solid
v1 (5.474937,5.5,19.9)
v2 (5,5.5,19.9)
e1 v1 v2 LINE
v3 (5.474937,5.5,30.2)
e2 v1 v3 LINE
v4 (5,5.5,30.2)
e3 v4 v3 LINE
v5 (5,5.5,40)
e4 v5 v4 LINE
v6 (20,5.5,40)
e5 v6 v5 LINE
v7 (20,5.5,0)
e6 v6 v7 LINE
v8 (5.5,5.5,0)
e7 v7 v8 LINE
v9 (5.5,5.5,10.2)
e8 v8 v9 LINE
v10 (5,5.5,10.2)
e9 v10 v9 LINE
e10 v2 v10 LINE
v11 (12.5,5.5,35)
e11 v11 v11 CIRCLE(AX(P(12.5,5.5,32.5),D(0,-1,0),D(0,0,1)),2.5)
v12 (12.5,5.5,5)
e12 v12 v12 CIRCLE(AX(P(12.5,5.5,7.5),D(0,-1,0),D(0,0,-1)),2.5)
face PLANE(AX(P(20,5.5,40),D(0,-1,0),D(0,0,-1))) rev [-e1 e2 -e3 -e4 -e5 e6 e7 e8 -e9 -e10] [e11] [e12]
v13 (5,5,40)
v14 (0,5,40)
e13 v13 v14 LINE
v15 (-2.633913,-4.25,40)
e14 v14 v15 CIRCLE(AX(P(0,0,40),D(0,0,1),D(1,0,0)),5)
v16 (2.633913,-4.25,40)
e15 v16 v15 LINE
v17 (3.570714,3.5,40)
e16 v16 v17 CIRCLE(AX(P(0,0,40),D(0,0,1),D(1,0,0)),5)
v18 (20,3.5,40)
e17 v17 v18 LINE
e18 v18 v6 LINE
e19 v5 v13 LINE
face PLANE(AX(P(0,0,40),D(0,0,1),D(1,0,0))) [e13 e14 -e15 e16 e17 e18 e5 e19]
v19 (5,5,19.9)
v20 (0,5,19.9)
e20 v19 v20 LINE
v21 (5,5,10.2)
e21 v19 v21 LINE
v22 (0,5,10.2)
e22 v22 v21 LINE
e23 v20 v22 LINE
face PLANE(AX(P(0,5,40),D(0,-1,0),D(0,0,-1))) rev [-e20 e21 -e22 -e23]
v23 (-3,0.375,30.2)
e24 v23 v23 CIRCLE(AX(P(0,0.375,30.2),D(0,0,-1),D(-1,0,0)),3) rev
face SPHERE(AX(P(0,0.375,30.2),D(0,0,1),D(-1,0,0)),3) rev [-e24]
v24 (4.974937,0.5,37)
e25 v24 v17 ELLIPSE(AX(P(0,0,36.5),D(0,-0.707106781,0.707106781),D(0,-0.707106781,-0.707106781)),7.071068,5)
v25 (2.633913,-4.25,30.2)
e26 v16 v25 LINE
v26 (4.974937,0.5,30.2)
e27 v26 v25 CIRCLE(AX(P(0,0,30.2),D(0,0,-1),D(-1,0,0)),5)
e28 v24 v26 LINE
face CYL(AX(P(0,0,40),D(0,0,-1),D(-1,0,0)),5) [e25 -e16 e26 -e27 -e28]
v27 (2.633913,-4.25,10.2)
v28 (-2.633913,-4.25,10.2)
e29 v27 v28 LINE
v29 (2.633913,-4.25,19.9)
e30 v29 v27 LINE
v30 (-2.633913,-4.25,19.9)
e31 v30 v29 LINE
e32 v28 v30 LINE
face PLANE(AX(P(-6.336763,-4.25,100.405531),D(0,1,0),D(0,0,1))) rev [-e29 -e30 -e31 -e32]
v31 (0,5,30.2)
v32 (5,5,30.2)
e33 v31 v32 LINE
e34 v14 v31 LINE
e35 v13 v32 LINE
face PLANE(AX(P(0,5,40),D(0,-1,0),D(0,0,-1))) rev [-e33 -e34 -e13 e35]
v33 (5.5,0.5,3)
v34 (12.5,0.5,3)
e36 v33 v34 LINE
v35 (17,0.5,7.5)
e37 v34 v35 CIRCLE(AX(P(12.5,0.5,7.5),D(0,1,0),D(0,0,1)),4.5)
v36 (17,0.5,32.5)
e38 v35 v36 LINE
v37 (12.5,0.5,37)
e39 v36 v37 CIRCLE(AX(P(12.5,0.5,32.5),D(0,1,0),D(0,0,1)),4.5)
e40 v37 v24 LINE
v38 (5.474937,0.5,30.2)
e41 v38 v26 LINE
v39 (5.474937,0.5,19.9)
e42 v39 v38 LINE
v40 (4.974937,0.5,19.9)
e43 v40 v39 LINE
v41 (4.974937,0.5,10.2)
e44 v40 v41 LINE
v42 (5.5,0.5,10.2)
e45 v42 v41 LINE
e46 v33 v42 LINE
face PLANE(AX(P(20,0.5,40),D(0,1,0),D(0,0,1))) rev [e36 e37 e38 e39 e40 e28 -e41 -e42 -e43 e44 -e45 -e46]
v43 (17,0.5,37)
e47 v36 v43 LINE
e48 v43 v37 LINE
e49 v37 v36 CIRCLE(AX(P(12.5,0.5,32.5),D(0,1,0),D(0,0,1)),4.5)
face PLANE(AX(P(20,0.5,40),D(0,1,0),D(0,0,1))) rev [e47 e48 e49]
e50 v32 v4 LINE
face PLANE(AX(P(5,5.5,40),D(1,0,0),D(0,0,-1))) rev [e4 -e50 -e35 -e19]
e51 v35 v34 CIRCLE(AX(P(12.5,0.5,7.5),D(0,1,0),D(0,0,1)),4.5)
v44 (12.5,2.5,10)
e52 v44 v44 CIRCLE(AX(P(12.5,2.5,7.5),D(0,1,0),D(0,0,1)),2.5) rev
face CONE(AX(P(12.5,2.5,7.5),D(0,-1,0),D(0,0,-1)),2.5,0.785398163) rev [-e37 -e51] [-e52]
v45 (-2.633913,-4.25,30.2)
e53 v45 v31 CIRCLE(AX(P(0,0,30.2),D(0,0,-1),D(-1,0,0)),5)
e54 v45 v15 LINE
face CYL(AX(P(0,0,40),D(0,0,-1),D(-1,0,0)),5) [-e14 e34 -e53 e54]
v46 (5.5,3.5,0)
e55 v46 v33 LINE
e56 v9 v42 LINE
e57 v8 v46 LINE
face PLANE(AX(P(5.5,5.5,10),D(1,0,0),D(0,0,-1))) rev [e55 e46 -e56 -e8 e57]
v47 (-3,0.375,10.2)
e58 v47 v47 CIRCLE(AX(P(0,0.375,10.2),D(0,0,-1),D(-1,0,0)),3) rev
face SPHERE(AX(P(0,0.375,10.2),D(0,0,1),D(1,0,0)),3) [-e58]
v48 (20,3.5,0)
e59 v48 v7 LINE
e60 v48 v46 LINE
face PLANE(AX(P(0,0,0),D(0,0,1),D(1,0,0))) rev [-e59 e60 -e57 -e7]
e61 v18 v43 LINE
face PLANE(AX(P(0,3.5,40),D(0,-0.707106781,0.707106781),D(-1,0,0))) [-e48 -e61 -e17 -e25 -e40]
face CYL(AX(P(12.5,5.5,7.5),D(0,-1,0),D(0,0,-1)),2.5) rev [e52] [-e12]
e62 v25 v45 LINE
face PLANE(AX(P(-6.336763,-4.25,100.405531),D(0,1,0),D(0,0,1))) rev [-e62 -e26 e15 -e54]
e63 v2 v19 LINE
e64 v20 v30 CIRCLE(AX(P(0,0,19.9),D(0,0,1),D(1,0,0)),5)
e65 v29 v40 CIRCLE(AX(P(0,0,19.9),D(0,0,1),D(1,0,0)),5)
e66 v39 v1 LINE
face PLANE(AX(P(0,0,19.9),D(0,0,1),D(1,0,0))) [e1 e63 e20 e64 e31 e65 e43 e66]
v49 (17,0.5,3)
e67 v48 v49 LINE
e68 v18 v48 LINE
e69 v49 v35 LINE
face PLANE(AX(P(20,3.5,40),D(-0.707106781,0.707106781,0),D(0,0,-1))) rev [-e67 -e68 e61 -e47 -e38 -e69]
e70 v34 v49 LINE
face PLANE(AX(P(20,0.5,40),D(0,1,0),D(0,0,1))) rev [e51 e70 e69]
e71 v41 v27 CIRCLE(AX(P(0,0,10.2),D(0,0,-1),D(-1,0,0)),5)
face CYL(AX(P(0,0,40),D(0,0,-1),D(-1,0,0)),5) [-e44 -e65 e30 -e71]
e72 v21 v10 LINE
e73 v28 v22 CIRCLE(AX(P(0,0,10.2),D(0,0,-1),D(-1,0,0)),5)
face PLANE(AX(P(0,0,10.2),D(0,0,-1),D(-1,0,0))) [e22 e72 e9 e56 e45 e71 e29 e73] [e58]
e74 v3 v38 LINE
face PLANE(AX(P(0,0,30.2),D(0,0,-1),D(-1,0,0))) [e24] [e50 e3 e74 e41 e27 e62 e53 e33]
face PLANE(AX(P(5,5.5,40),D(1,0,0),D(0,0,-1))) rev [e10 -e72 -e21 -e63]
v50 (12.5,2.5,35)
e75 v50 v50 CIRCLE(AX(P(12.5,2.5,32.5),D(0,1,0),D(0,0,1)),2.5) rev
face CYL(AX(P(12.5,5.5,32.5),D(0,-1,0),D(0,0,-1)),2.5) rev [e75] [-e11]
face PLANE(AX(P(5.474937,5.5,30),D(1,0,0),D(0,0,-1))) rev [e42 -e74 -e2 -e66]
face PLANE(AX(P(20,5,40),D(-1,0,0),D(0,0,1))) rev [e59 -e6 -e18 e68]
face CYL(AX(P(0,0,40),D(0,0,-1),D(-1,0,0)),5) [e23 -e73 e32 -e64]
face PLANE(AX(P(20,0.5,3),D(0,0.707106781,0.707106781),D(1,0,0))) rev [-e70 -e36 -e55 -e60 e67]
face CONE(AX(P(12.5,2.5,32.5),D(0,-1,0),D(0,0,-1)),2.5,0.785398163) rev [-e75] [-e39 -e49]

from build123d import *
from build123d.topology import SkipClean

# Parameters (mm, degrees)
IZIM1_R                     = 3.5
Y_KSEKLIK_EKSTR_ZYON1_DEPTH = 40
KES_EKSTR_ZYON1_DEPTH       = 46.058295574
KES_EKSTR_ZYON1_DEPTH_BACK  = 46.058295574
IZIM3_W                     = 10
IZIM3_H                     = 10
KES_EKSTR_ZYON2_DEPTH       = 46.771852704
IZIM5_R                     = 2.5
KES_EKSTR_ZYON4_DEPTH       = 46
PAH1_SIZE                   = 3
IZIM4_W                     = 0.5
IZIM4_H                     = 10
KES_EKSTR_ZYON5_DEPTH       = 46
PAH2_SIZE                   = 2
BOSS_EXTRUDE1_START         = -10
SKETCH1_R                   = 3.5
BOSS_EXTRUDE1_DEPTH         = 10
BOSS_EXTRUDE2_START         = -10
SKETCH2_R                   = 3.5
BOSS_EXTRUDE2_DEPTH         = 10
CUT_EXTRUDE1_DEPTH          = 0.2
CUT_EXTRUDE2_DEPTH          = 0.2
CUT_EXTRUDE3_START          = -0.1
CUT_EXTRUDE3_DEPTH          = 0.1


with BuildPart() as part:
    # Çizim1 → Yükseklik-Ekstrüzyon1 (new body)
    with BuildSketch(Plane.XY):
        with BuildLine():
            Line((0, 5), (5, 5))
            Line((5, 5), (5, 5.5))
            Line((5, 5.5), (20, 5.5))
            Line((20, 5.5), (20, 5))
            Line((20, 5), (20, 0.5))
            Line((20, 0.5), (4.974937186, 0.5))
            ThreePointArc((4.974937186, 0.5), (-3.354101966, -3.708099244), (0, 5))
        make_face()
        Circle(IZIM1_R, mode=Mode.SUBTRACT)
    extrude(amount=Y_KSEKLIK_EKSTR_ZYON1_DEPTH)

    # Çizim2 → Kes-Ekstrüzyon1 (cut, two sides: drawn at the far end of the back side and taken through both)
    with BuildSketch(Plane.XY.offset(40).offset(-KES_EKSTR_ZYON1_DEPTH_BACK)):
        Polygon((-72.503925857, -4.25), (-6.336762511, -4.25), (12.42239056, -4.25), (78.589553905, -4.25), (78.589553905, -136.584326691), (-72.503925857, -136.584326691), align=None)
    extrude(amount=KES_EKSTR_ZYON1_DEPTH + KES_EKSTR_ZYON1_DEPTH_BACK, mode=Mode.SUBTRACT)

    # Çizim3 → Kes-Ekstrüzyon2 (cut, through all)
    with BuildSketch(Plane.XZ.offset(4.25)):
        with Locations((0, 25)):
            Rectangle(IZIM3_W, IZIM3_H)
        with Locations((0, 5)):
            Rectangle(IZIM3_W, IZIM3_H)
    extrude(amount=-KES_EKSTR_ZYON2_DEPTH, mode=Mode.SUBTRACT)

    # Çizim5 → Kes-Ekstrüzyon4 (cut, through all)
    with BuildSketch(Plane.XZ.offset(-0.5)):
        with Locations(Location((12.5, 7.5, 0), (0, 0, 270))):
            Circle(IZIM5_R)
        with Locations(Location((12.5, 32.5, 0), (0, 0, 90))):
            Circle(IZIM5_R)
    extrude(amount=-KES_EKSTR_ZYON4_DEPTH, mode=Mode.SUBTRACT)

    # Pah1
    pah1_edges = [part.edges().sort_by_distance(p)[0] for p in [
        (20, 0.5, 20),
        (12.487468593, 0.5, 40),
        (12.5, 0.5, 0),
    ]]
    chamfer(pah1_edges, length=PAH1_SIZE)

    # Çizim4 → Kes-Ekstrüzyon5 (cut, through all)
    with BuildSketch(Plane.XZ.offset(-0.5)):
        with Locations((5.224937186, 25)):
            Rectangle(IZIM4_W, IZIM4_H)
        with Locations((5.25, 5)):
            Rectangle(IZIM4_W, IZIM4_H)
    extrude(amount=-KES_EKSTR_ZYON5_DEPTH, mode=Mode.SUBTRACT)

    # Pah2
    pah2_edges = [part.edges().sort_by_distance(p)[0] for p in [
        (12.5, 0.5, 10),
        (12.5, 0.5, 30),
    ]]
    chamfer(pah2_edges, length=PAH2_SIZE - 0.0001)  # a hair under: the kernel refuses the full size

    # Sketch1 → Boss-Extrude1 (add)
    with BuildSketch(Plane.XY.offset(40).offset(BOSS_EXTRUDE1_START)):
        with Locations(Location((0, 0, 0), (0, 0, 180))):
            Circle(SKETCH1_R)
    extrude(amount=BOSS_EXTRUDE1_DEPTH)

    # Sketch2 → Boss-Extrude2 (add)
    with BuildSketch(Plane.XY.offset(20).offset(BOSS_EXTRUDE2_START)):
        Circle(SKETCH2_R)
    extrude(amount=BOSS_EXTRUDE2_DEPTH)

    # Sketch3 → Cut-Extrude1 (cut)
    with BuildSketch(Plane(origin=(0, 0, 30), x_dir=(-1, 0, 0), z_dir=(0, 0, -1))):
        with BuildLine():
            Line((0, 5), (-5, 5))
            Line((-5, 5), (-5, 5.5))
            Line((-5, 5.5), (-5.474937186, 5.5))
            Line((-5.474937186, 5.5), (-5.474937186, 0.5))
            Line((-5.474937186, 0.5), (-4.974937186, 0.5))
            ThreePointArc((-4.974937186, 0.5), (-4.484894308, -2.210367175), (-2.633913438, -4.25))
            Line((-2.633913438, -4.25), (2.633913438, -4.25))
            ThreePointArc((2.633913438, -4.25), (4.808846015, 1.369306394), (0, 5))
        make_face()
    extrude(amount=-CUT_EXTRUDE1_DEPTH, mode=Mode.SUBTRACT)

    # Sketch4 → Cut-Extrude2 (cut)
    with BuildSketch(Plane(origin=(0, 0, 10), x_dir=(-1, 0, 0), z_dir=(0, 0, -1))):
        with BuildLine():
            Line((-2.633913438, -4.25), (2.633913438, -4.25))
            ThreePointArc((2.633913438, -4.25), (4.808846015, 1.369306394), (0, 5))
            Line((0, 5), (-5, 5))
            Line((-5, 5), (-5, 5.5))
            Line((-5, 5.5), (-5.5, 5.5))
            Line((-5.5, 5.5), (-5.5, 0.5))
            Line((-5.5, 0.5), (-4.974937186, 0.5))
            ThreePointArc((-4.974937186, 0.5), (-4.484894308, -2.210367175), (-2.633913438, -4.25))
        make_face()
    extrude(amount=-CUT_EXTRUDE2_DEPTH, mode=Mode.SUBTRACT)

    # Sketch5 → Cut-Extrude3 (cut)
    with BuildSketch(Plane.XY.offset(20).offset(CUT_EXTRUDE3_START)):
        with BuildLine():
            Line((4.974937186, 0.5), (5.474937186, 0.5))
            Line((5.474937186, 0.5), (5.474937186, 5.5))
            Line((5.474937186, 5.5), (5, 5.5))
            Line((5, 5.5), (5, 5))
            Line((5, 5), (0, 5))
            ThreePointArc((0, 5), (-4.808846015, 1.369306394), (-2.633913438, -4.25))
            Line((-2.633913438, -4.25), (2.633913438, -4.25))
            ThreePointArc((2.633913438, -4.25), (4.484894308, -2.210367175), (4.974937186, 0.5))
        make_face()
    extrude(amount=CUT_EXTRUDE3_DEPTH, mode=Mode.SUBTRACT)

    # Sketch6 → Revolve1 (revolve)
    with BuildSketch(Plane(origin=(0, 0.375, 0), x_dir=(-1, 0, 0), z_dir=(0, -1, 0)), mode=Mode.PRIVATE) as revolve1_sk:
        with BuildLine():
            ThreePointArc((0, -7.2), (-3, -10.2), (0, -13.2))
            Line((0, -13.2), (0, -7.2))
        make_face()
        with BuildLine():
            Line((0, -7.2), (0, -13.2))
            ThreePointArc((0, -13.2), (2.121320344, -12.321320344), (3, -10.2))
            ThreePointArc((3, -10.2), (2.121320344, -8.078679656), (0, -7.2))
        make_face()
    revolve(revolve1_sk.sketch.rotate(Axis((0, 0.375, 13.2), (0, 0, -1)), 180), axis=Axis((0, 0.375, 13.2), (0, 0, -1)))

    # Sketch6<7> → Cut-Revolve1 (revolve, cut)
    with SkipClean():  # the faces are left unmerged after this step: merging them gives an invalid solid
        with BuildSketch(Plane(origin=(0, 0.375, 0), x_dir=(-1, 0, 0), z_dir=(0, -1, 0)), mode=Mode.PRIVATE) as cut_revolve1_sk:
            with BuildLine():
                ThreePointArc((0, -27.2), (-3, -30.2), (0, -33.2))
                Line((0, -33.2), (0, -27.2))
            make_face()
            with BuildLine():
                Line((0, -27.2), (0, -33.2))
                ThreePointArc((0, -33.2), (2.121320344, -32.321320344), (3, -30.2))
                ThreePointArc((3, -30.2), (2.121320344, -28.078679656), (0, -27.2))
            make_face()
        revolve(cut_revolve1_sk.sketch.rotate(Axis((0, 0.375, 33.2), (0, 0, -1)), 180), axis=Axis((0, 0.375, 33.2), (0, 0, -1)), mode=Mode.SUBTRACT)
    add(part.part.scale(1), mode=Mode.REPLACE)  # the faces are merged on a copy


solid = part.part
